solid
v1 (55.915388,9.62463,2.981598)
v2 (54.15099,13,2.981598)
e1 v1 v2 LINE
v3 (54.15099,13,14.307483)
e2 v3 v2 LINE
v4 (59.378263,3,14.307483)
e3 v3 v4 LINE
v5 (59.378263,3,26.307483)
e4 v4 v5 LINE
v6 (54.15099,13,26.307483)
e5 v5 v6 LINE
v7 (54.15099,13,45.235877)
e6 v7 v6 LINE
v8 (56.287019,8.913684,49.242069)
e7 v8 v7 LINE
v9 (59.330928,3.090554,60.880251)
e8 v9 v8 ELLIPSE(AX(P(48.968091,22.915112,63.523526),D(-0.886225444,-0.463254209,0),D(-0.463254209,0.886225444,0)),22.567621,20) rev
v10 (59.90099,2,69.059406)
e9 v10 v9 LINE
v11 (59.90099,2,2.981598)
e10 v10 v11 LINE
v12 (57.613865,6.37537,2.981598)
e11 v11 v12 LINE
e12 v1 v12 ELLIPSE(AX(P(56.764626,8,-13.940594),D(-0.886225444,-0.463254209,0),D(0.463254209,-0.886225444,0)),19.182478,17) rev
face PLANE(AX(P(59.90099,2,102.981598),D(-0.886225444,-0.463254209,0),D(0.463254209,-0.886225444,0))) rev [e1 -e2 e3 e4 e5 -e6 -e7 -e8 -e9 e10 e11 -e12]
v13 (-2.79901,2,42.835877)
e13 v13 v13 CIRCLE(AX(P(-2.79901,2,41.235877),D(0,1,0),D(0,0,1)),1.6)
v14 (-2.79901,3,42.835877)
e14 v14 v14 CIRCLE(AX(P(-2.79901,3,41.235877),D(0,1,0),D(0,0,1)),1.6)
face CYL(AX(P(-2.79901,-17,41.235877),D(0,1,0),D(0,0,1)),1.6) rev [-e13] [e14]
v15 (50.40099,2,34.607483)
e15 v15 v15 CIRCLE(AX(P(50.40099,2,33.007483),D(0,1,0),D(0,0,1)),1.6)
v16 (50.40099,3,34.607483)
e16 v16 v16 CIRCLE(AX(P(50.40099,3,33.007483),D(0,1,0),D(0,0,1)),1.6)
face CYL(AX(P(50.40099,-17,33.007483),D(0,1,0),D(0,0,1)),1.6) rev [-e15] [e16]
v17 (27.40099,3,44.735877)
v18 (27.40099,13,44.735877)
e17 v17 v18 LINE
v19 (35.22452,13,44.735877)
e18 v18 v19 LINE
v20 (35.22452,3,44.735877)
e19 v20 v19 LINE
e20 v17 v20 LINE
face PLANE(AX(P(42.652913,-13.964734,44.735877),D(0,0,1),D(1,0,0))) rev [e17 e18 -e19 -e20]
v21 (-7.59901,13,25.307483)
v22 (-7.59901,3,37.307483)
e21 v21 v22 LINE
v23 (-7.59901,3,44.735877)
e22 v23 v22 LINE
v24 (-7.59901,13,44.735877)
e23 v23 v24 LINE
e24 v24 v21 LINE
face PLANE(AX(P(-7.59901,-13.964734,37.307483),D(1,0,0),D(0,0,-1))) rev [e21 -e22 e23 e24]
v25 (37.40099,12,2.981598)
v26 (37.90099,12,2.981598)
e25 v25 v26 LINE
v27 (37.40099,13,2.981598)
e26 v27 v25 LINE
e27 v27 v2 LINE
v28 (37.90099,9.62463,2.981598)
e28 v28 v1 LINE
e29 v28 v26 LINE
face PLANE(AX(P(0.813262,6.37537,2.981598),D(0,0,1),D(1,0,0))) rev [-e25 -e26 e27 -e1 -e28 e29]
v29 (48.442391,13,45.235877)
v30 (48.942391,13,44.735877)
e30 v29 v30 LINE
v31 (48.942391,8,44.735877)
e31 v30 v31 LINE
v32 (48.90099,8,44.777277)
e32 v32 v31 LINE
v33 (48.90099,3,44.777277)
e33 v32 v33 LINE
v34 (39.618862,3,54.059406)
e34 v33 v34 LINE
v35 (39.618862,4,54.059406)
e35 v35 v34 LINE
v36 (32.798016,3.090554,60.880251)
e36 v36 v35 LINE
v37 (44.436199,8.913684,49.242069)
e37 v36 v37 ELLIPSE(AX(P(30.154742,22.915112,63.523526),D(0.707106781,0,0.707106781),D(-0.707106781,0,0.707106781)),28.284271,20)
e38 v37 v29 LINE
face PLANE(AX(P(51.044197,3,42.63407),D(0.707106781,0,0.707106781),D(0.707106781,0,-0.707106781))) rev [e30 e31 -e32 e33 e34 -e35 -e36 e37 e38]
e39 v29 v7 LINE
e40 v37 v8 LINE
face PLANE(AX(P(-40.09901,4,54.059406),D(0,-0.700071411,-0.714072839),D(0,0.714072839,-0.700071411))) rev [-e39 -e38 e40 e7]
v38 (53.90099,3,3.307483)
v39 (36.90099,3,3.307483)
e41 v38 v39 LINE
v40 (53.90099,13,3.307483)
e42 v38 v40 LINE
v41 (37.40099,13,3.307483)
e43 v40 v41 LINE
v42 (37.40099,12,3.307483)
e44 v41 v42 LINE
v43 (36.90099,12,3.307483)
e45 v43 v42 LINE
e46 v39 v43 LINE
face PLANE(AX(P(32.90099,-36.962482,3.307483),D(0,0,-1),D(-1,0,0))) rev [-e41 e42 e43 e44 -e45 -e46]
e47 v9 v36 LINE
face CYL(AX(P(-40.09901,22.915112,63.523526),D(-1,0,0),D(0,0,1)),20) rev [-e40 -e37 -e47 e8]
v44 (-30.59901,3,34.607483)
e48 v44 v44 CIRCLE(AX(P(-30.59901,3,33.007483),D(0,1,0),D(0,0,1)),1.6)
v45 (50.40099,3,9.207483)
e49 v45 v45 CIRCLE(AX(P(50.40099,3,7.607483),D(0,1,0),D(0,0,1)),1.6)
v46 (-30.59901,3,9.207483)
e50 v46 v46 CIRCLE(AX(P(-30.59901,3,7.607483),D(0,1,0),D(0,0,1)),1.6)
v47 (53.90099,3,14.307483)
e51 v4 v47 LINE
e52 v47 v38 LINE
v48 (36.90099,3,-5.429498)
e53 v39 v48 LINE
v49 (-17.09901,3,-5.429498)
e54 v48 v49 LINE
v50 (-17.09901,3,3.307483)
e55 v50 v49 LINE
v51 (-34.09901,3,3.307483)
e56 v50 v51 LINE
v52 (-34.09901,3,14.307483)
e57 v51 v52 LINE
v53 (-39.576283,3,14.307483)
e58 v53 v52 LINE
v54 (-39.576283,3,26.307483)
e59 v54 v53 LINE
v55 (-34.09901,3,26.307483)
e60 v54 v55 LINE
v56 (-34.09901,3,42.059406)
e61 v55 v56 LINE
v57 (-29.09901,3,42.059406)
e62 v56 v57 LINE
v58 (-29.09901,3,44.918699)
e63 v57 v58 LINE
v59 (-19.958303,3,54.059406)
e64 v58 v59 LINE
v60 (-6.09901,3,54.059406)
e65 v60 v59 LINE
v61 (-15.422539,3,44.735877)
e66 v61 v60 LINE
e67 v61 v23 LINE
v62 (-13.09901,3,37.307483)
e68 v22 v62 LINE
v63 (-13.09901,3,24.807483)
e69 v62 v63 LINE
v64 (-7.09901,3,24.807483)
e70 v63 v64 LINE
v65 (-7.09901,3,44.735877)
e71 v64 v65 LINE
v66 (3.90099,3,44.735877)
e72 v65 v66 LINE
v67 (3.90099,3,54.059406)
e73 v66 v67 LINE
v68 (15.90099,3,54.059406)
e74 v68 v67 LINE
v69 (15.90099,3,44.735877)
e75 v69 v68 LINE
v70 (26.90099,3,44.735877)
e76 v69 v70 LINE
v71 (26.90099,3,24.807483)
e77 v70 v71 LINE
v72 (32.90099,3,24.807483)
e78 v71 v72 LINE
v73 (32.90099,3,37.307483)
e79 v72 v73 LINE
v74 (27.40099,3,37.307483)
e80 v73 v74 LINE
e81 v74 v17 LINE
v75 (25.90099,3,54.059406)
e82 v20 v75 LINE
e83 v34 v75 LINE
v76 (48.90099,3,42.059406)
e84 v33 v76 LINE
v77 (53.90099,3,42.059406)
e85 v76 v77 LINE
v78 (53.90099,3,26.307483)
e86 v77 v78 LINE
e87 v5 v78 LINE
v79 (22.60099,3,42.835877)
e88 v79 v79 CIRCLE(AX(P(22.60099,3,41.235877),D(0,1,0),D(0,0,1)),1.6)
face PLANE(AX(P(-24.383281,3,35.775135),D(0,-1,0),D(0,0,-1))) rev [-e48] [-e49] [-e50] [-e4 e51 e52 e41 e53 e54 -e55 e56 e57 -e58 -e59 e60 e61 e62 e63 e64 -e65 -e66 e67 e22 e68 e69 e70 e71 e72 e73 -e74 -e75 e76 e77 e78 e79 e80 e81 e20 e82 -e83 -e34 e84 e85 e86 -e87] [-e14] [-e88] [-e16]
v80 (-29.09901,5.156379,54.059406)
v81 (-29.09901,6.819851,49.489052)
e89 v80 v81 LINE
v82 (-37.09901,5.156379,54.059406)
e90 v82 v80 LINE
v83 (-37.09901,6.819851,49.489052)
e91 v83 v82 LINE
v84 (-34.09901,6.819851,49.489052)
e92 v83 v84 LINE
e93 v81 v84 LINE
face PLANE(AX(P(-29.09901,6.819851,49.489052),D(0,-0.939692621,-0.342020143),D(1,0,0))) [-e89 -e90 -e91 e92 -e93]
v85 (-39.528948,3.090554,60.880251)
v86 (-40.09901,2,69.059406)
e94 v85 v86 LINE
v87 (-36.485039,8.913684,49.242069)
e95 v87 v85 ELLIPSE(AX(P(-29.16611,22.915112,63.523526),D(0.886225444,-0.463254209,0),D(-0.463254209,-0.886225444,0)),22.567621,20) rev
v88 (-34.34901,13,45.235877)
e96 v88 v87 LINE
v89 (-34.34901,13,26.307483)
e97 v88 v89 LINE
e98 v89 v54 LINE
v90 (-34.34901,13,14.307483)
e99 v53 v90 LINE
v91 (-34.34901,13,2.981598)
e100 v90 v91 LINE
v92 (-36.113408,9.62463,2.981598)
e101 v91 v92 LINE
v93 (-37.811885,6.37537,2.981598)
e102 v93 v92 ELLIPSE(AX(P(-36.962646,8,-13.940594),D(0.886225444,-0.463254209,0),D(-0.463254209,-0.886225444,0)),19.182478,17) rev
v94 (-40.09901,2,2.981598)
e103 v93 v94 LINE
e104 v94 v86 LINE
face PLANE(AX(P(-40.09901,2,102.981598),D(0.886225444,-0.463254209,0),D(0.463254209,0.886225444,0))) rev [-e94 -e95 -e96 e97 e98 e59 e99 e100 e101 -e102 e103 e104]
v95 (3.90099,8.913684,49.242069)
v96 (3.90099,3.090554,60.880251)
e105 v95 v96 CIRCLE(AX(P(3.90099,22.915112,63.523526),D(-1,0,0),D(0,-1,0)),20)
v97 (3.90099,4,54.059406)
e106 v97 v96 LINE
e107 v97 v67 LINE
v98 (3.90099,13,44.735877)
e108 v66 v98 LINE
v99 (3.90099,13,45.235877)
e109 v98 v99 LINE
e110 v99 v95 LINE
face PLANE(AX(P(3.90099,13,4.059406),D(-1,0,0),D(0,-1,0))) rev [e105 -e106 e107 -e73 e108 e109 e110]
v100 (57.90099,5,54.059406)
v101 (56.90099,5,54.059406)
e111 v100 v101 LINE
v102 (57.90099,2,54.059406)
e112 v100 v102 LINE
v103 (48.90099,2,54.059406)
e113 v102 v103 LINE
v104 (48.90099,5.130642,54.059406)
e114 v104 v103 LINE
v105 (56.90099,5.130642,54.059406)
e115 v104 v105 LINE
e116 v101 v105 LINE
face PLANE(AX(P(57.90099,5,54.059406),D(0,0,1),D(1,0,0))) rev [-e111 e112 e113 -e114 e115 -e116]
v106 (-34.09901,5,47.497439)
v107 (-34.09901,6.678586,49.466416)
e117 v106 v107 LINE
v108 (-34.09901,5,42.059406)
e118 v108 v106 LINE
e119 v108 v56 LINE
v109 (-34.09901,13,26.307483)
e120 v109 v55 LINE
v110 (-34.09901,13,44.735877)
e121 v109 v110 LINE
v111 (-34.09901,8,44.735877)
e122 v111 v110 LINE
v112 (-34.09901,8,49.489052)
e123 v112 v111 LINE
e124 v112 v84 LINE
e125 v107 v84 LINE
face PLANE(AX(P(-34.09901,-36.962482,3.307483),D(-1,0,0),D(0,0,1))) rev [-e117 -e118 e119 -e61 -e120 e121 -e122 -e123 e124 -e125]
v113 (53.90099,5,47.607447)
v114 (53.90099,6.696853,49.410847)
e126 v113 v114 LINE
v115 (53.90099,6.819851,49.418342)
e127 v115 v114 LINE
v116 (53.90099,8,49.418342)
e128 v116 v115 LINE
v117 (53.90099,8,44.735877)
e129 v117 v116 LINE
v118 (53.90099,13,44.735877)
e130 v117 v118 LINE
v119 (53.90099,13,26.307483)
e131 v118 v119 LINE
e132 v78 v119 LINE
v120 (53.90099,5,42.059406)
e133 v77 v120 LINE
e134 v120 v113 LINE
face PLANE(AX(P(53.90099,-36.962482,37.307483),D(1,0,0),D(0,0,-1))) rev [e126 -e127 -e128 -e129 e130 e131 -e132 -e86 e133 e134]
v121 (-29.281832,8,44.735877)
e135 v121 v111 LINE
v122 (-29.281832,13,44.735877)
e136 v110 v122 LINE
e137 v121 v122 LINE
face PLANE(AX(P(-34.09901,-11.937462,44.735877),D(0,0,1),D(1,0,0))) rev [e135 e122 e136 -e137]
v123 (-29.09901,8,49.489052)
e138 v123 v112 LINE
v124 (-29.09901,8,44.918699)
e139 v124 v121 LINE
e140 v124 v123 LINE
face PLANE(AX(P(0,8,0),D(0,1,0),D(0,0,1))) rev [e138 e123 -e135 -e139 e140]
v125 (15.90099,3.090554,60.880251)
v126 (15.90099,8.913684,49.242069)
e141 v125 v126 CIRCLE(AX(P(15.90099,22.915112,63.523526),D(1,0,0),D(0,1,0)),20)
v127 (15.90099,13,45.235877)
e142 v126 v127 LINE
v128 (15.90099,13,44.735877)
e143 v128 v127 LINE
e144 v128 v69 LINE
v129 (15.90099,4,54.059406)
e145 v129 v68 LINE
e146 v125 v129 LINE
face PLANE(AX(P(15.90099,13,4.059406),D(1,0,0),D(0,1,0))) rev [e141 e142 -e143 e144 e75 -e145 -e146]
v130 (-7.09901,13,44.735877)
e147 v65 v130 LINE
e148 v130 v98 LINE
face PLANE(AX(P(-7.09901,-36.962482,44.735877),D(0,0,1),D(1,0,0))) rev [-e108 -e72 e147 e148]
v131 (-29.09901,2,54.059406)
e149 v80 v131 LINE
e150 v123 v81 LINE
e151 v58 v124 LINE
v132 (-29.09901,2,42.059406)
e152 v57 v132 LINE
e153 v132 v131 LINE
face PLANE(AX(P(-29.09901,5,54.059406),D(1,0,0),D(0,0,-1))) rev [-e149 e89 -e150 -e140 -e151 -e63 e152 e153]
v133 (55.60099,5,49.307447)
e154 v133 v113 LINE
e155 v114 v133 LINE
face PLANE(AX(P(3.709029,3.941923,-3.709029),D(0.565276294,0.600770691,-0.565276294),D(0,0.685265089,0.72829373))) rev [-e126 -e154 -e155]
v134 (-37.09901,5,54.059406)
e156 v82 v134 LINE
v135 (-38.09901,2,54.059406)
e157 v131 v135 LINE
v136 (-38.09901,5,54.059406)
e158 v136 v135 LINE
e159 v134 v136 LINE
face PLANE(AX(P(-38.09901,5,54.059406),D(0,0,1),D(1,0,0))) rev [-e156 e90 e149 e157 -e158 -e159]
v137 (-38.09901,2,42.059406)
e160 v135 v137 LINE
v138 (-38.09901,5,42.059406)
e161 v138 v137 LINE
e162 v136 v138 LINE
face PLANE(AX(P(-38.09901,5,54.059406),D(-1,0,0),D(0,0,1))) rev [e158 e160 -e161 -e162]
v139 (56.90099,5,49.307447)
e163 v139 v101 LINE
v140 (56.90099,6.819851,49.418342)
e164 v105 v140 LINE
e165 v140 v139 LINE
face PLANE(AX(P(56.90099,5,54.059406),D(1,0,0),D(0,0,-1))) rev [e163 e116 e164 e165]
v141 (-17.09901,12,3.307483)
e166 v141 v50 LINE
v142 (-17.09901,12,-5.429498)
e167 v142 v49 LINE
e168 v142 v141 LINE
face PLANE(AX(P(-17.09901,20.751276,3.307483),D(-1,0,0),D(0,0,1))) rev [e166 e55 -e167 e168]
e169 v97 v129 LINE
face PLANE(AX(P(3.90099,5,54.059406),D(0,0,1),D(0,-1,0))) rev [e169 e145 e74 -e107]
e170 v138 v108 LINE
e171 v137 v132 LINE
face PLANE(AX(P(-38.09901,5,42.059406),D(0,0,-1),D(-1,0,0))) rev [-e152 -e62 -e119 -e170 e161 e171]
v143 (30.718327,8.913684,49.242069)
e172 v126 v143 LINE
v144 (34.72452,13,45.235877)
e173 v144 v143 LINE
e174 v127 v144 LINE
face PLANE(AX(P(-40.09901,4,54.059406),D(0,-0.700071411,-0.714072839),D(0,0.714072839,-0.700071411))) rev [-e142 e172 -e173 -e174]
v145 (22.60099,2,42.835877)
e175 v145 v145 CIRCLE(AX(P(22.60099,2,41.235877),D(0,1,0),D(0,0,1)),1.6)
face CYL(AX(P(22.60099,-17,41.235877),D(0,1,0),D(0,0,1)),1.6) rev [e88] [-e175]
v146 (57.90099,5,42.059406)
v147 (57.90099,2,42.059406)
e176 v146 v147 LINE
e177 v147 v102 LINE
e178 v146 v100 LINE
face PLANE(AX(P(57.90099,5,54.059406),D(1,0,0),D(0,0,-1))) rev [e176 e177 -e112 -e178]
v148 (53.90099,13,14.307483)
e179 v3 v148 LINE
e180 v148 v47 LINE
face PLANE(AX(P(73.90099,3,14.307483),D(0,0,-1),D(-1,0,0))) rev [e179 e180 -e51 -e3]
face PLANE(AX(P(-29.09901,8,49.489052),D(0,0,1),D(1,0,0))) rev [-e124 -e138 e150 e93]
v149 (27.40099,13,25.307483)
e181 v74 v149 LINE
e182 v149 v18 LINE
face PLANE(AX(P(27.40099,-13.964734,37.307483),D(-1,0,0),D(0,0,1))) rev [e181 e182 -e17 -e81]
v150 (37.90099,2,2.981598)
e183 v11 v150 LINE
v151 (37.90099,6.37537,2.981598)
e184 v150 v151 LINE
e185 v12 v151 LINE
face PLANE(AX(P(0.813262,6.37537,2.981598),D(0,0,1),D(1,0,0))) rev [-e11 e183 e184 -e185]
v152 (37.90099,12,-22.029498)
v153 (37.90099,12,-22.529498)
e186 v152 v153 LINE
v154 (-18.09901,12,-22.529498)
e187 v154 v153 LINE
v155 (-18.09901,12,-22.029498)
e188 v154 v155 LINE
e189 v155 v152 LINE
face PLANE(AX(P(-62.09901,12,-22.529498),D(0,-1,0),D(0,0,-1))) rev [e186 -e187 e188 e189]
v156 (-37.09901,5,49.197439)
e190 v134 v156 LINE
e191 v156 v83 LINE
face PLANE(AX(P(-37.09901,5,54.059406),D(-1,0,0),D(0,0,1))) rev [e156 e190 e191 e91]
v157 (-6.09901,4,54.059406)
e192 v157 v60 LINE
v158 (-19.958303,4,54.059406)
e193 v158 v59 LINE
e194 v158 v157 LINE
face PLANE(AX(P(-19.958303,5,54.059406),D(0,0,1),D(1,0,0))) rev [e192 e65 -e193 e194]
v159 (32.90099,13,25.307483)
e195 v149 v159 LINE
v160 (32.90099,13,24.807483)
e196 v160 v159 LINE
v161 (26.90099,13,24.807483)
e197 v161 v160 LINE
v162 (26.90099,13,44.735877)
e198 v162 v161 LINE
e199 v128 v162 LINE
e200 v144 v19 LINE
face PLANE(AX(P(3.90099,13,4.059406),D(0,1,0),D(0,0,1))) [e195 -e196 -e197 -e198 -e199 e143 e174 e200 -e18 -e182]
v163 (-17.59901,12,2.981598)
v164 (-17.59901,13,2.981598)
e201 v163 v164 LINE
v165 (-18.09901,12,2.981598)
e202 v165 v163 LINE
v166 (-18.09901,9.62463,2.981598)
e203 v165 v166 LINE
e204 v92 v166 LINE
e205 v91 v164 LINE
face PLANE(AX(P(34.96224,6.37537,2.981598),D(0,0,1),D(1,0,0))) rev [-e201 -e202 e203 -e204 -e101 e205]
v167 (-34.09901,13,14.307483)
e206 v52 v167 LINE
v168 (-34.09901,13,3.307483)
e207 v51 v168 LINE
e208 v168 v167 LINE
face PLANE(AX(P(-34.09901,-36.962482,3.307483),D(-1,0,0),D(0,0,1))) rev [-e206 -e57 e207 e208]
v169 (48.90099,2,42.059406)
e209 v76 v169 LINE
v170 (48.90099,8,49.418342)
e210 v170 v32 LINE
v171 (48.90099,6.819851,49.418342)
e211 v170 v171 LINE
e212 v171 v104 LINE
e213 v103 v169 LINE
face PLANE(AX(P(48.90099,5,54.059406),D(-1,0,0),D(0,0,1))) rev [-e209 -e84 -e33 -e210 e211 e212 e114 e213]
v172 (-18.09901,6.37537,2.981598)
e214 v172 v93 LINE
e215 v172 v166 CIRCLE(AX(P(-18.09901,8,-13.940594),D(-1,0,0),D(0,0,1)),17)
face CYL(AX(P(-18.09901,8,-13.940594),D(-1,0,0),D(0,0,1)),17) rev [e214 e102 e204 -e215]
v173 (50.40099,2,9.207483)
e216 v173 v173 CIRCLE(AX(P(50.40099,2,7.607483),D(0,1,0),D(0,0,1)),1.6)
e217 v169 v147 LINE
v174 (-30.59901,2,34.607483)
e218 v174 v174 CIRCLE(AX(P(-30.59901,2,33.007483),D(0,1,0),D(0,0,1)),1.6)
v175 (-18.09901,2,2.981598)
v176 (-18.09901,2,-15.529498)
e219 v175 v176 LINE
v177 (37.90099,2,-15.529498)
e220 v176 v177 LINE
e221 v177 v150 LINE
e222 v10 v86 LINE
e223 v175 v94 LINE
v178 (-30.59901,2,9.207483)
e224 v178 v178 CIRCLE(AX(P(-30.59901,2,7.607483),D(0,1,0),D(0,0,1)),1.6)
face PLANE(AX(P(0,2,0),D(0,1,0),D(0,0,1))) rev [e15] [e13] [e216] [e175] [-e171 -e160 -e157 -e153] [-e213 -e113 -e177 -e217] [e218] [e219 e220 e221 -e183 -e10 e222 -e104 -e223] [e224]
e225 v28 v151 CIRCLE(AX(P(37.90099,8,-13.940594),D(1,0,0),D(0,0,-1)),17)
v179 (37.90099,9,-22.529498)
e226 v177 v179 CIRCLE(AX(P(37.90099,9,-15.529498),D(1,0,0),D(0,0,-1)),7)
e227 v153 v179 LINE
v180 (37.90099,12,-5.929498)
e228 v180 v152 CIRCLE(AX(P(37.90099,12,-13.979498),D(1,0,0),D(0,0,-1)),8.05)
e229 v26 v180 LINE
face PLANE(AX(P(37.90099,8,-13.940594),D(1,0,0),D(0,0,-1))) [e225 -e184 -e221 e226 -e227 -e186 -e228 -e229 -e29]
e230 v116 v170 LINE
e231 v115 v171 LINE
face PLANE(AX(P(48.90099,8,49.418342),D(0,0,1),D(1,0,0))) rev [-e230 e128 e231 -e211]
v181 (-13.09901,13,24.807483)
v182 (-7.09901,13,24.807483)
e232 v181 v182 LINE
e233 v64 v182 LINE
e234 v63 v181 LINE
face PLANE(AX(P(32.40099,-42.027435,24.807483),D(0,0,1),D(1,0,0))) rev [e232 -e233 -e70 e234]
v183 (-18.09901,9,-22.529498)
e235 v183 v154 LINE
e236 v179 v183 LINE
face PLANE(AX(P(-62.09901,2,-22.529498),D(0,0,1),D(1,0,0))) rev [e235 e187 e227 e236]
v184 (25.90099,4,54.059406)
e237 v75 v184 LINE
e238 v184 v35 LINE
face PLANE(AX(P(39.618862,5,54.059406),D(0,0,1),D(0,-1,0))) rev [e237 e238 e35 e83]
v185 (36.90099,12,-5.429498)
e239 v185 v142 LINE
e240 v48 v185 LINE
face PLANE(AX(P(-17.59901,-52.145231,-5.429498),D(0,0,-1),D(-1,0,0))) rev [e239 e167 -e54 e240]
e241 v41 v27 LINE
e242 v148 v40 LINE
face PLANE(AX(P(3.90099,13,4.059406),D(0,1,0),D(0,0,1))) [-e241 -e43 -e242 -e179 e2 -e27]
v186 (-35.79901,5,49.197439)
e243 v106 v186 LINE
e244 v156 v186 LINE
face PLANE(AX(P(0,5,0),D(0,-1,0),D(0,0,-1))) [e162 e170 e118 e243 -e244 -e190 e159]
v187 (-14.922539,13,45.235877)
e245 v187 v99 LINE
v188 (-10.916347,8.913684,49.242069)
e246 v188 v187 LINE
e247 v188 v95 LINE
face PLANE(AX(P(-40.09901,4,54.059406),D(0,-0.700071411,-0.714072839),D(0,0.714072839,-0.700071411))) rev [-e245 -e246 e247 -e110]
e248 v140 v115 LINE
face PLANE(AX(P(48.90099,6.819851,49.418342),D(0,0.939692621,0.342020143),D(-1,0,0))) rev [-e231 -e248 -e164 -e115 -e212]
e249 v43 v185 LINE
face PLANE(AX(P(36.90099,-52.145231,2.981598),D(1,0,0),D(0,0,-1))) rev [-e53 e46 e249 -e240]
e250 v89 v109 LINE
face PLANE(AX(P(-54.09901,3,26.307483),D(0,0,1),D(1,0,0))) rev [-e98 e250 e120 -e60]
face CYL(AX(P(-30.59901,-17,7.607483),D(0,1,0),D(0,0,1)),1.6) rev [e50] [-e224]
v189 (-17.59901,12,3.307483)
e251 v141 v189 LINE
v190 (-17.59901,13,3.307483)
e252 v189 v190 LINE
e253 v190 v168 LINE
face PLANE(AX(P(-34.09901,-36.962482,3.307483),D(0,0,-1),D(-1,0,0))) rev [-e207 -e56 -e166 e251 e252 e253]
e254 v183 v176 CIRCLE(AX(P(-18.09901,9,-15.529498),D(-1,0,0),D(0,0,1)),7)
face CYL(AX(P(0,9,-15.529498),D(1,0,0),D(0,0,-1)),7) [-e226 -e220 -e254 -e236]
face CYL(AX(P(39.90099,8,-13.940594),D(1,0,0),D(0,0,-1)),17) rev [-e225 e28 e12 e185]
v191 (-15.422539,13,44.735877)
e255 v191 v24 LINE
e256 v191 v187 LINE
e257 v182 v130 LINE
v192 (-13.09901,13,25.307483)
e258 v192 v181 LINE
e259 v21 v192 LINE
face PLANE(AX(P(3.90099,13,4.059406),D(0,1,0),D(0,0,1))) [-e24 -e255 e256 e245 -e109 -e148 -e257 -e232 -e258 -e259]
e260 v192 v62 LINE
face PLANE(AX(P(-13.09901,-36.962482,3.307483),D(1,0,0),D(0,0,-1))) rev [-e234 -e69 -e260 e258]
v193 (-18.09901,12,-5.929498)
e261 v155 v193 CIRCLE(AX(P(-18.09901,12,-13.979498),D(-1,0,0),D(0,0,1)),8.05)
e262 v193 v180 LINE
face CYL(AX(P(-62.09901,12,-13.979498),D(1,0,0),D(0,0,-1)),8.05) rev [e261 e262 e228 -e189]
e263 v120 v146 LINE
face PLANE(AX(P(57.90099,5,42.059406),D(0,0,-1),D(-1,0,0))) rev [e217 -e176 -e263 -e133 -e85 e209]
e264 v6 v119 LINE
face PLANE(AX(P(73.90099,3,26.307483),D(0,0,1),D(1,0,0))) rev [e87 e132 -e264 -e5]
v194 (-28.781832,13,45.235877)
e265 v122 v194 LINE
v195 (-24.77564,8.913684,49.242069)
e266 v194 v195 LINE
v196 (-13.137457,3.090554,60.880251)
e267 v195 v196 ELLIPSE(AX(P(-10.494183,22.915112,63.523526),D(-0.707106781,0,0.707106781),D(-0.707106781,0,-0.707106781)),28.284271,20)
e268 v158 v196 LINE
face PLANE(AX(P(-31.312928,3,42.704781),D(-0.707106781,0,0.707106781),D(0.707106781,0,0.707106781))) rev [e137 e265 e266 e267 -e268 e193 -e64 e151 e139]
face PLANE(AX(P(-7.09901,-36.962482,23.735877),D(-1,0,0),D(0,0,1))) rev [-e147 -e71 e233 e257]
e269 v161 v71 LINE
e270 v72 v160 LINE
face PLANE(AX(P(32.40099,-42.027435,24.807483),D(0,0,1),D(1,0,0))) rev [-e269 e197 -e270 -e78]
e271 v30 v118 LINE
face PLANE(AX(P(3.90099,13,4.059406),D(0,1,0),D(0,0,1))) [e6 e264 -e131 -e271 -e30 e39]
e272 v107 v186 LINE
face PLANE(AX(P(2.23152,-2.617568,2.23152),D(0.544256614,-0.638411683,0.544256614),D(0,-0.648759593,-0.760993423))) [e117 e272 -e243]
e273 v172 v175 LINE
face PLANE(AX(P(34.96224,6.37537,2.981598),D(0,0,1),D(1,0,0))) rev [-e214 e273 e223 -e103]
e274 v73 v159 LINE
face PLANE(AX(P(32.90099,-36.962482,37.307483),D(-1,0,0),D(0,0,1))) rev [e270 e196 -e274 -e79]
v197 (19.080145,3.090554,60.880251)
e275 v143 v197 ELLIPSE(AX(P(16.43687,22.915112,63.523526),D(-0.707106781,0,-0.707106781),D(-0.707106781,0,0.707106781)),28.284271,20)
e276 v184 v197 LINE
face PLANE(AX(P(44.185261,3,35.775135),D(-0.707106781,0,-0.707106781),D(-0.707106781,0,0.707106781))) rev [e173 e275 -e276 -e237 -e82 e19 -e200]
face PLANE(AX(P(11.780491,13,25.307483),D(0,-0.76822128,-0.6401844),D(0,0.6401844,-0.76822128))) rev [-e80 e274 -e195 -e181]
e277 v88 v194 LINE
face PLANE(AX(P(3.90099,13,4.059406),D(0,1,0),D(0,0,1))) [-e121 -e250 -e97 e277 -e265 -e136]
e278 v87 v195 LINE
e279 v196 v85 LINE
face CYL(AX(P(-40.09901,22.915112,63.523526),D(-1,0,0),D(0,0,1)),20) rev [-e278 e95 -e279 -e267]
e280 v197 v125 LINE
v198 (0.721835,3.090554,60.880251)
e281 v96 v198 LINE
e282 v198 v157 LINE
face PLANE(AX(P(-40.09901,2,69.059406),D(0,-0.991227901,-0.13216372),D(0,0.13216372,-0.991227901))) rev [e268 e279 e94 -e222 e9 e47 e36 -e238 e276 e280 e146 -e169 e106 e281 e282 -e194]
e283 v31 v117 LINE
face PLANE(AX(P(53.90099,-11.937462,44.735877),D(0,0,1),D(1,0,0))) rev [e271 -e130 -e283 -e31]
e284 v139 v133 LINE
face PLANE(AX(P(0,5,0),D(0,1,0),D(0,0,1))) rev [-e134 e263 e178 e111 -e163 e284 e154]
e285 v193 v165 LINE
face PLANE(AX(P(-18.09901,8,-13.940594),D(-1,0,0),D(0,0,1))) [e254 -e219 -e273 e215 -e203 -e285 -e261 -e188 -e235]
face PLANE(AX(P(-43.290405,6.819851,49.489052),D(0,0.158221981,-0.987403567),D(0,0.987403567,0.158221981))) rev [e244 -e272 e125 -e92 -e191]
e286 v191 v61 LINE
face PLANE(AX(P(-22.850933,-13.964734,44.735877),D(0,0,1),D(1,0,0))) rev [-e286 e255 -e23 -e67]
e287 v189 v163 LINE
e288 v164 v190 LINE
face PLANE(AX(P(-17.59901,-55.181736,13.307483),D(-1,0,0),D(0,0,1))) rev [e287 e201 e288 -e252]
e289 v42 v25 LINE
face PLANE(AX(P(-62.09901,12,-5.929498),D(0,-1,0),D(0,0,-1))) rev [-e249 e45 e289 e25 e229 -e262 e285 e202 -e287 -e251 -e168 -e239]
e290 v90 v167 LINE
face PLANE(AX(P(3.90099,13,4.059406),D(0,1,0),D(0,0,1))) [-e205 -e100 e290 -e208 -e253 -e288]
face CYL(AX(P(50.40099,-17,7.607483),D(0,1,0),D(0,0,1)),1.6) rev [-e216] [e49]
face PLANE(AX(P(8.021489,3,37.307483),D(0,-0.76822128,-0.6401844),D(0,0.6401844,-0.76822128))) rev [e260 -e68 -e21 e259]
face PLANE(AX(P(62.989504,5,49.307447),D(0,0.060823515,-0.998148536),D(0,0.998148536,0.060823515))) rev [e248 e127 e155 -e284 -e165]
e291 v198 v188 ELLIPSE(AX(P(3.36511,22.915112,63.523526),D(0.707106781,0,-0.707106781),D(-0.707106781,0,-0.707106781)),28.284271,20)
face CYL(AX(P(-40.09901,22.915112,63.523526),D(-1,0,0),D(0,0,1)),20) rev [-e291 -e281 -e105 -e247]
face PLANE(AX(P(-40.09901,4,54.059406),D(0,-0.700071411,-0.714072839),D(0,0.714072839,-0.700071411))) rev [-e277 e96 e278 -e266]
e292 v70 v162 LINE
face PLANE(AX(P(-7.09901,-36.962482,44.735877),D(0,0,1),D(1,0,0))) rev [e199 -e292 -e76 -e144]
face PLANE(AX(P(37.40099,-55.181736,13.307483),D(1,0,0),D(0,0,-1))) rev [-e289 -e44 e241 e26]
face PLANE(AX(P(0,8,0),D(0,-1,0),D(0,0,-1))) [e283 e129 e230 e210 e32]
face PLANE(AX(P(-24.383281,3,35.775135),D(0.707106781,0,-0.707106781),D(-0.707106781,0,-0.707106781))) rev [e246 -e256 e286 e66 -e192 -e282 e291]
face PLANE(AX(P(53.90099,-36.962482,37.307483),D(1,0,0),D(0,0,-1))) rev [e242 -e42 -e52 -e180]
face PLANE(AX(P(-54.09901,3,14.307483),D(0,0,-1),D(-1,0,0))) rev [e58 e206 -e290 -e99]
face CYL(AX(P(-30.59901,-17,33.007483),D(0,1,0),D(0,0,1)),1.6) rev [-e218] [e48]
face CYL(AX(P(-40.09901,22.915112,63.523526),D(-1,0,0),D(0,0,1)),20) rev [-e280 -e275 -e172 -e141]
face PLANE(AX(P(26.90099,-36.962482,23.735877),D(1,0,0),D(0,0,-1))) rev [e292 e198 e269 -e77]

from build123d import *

# Parameters (mm, degrees)
SKETCH1_W             = 100
SKETCH1_H             = 95
BOSS_EXTRUDE2_DEPTH   = 20
CUT_EXTRUDE2_DEPTH    = 20
CUT_EXTRUDE3_START    = -22
CUT_EXTRUDE3_DEPTH    = 22
CUT_EXTRUDE4_DEPTH    = 2
SKETCH7_W             = 12
SKETCH7_H             = 10
CUT_EXTRUDE5_DEPTH    = 60
BOSS_EXTRUDE3_DEPTH   = 60
BOSS_EXTRUDE3_2_DEPTH = 60
SKETCH9_W             = 9.8
SKETCH9_H             = 15.2
CUT_EXTRUDE6_DEPTH    = 40
SKETCH10_W            = 9.7
SKETCH10_H            = 15.2
CUT_EXTRUDE7_DEPTH    = 40
SKETCH11_W            = 12
SKETCH11_H            = 10
CUT_EXTRUDE8_DEPTH    = 100
SKETCH12_W            = 39.436597342
SKETCH12_H            = 19.718298671
CUT_EXTRUDE9_DEPTH    = 100
CUT_EXTRUDE11_DEPTH   = 100
BOSS_EXTRUDE4_START   = -100
BOSS_EXTRUDE4_DEPTH   = 100
CUT_EXTRUDE12_REACH   = 95.581
SKETCH16_W            = 118.541652127
SKETCH16_H            = 71.876381232
SKETCH17_W            = 118.826271758
SKETCH17_H            = 93.94417767
CUT_EXTRUDE13_DEPTH   = 10
SKETCH18_R            = 8.1
CUT_EXTRUDE14_DEPTH   = 100
SKETCH19_W            = 45
SKETCH19_H            = 22.574653526
CUT_EXTRUDE16_DEPTH   = 10
SKETCH23_W            = 100
SKETCH23_H            = 16.30510129
BOSS_EXTRUDE6_DEPTH   = 10
SKETCH24_W            = 34
SKETCH24_H            = 21
CUT_EXTRUDE17_DEPTH   = 10
SKETCH25_W            = 45
SKETCH25_H            = 9.359456604
CUT_EXTRUDE18_DEPTH   = 10
SKETCH26_W            = 21
SKETCH26_H            = 34
CUT_EXTRUDE19_DEPTH   = 10
CUT_EXTRUDE20_DEPTH   = 22
CUT_EXTRUDE21_DEPTH   = 22
SKETCH29_W            = 15.251923191
SKETCH29_H            = 7.428393779
CUT_EXTRUDE22_DEPTH   = 10
CUT_EXTRUDE23_DEPTH   = 5.5
CUT_EXTRUDE24_DEPTH   = 5.5
BOSS_EXTRUDE9_DEPTH   = 100
SKETCH44_W            = 96.870466172
SKETCH44_H            = 84.683658551
CUT_EXTRUDE37_DEPTH   = 9.8
SKETCH45_W            = 7.532932596
SKETCH45_H            = 10
CUT_EXTRUDE38_DEPTH   = 100
SKETCH46_W            = 12
SKETCH46_H            = 85.376414904
CUT_EXTRUDE39_DEPTH   = 100
SKETCH47_W            = 144.570000294
SKETCH47_H            = 119.898222903
CUT_EXTRUDE40_DEPTH   = 2
CUT_EXTRUDE41_DEPTH   = 100
SKETCH49_W            = 33.934396209
SKETCH49_H            = 51.308285461
CUT_EXTRUDE44_DEPTH   = 9.7
SKETCH51_W            = 12
SKETCH51_H            = 7.5
BOSS_EXTRUDE13_DEPTH  = 2
CUT_EXTRUDE47_DEPTH   = 100
FILLET6_R             = 20
CUT_EXTRUDE48_DEPTH   = 100
SKETCH56_W            = 55
SKETCH56_H            = 18.976681206
CUT_EXTRUDE49_DEPTH   = 10
SKETCH57_W            = 12.959426316
SKETCH57_H            = 7.428393779
SKETCH57_W_2          = 11.011417888
CUT_EXTRUDE50_DEPTH   = 10
SKETCH58_W            = 33.922191822
SKETCH58_H            = 11
BOSS_EXTRUDE14_DEPTH  = 56
CUT_EXTRUDE52_DEPTH   = 100
SKETCH60_W            = 54.5
SKETCH60_H            = 8.411095911
CUT_EXTRUDE54_DEPTH   = 9
SKETCH62_W            = 9
SKETCH62_H            = 12
CUT_EXTRUDE55_DEPTH   = 3
SKETCH63_W            = 5
SKETCH63_H            = 7.358935777
SKETCH63_H_2          = 7.429646455
CUT_EXTRUDE56_DEPTH   = 3
CHAMFER1_SIZE         = 5
CHAMFER1_SIZE_2       = 1.819851171
CUT_EXTRUDE57_DEPTH   = 3
CUT_EXTRUDE58_DEPTH   = 3
CHAMFER3_START        = 4.100125042
CHAMFER3_DEPTH        = 0.925236243
SKETCH67_W            = 12
SKETCH67_H            = 10
CUT_EXTRUDE59_DEPTH   = 20
SKETCH68_W            = 12
SKETCH68_H            = 10
CUT_EXTRUDE60_DEPTH   = 20
SKETCH69_W            = 0.5
SKETCH69_H            = 0.325884987
BOSS_EXTRUDE15_DEPTH  = 9
SKETCH70_W            = 0.5
SKETCH70_H            = 8.736980898
BOSS_EXTRUDE16_DEPTH  = 9
SKETCH71_W            = 45
SKETCH71_H            = 1.571606221
CUT_EXTRUDE61_DEPTH   = 10
SKETCH72_W            = 47.768265836
SKETCH72_H            = 12.037959142
CUT_EXTRUDE62_DEPTH   = 10
CHAMFER4_START        = 4.610133616
CHAMFER4_DEPTH        = 1.951310752
FILLET10_R            = 7
SKETCH73_R            = 1.6
CUT_EXTRUDE63_DEPTH   = 20


with BuildPart() as part:
    # Sketch1 → Boss-Extrude2 (new body)
    with BuildSketch(Plane(origin=(0, 0, 0), x_dir=(1, 0, 0), z_dir=(0, 1, 0))):
        with Locations((9.900990099, -16.559405941)):
            Rectangle(SKETCH1_W, SKETCH1_H)
    extrude(amount=BOSS_EXTRUDE2_DEPTH)

    # Sketch2 → Cut-Extrude2 (cut)
    with BuildSketch(Plane(origin=(59.900990099, 0, 0), x_dir=(0, 0, -1), z_dir=(1, 0, 0))):
        with BuildLine():
            Line((-1.059405941, 0), (28.940594059, 0))
            Line((28.940594059, 0), (30.940594059, 0))
            Line((30.940594059, 0), (30.940594059, 20))
            Line((30.940594059, 20), (25.982188638, 20))
            Line((25.982188638, 20), (1.898999481, 20))
            ThreePointArc((1.898999481, 20), (-2.876419925, 10.487577267), (-1.059405941, 0))
        make_face()
    extrude(amount=-CUT_EXTRUDE2_DEPTH, mode=Mode.SUBTRACT)

    # Sketch3 → Cut-Extrude3 (cut)
    with BuildSketch(Plane.ZY.offset(40.099009901).offset(CUT_EXTRUDE3_START)):
        with BuildLine():
            Line((-1.898999481, 20), (-30.940594059, 20))
            Line((-30.940594059, 20), (-30.940594059, 0))
            Line((-30.940594059, 0), (1.059405941, 0))
            ThreePointArc((1.059405941, 0), (2.876419925, 10.487577267), (-1.898999481, 20))
        make_face()
    extrude(amount=CUT_EXTRUDE3_DEPTH, mode=Mode.SUBTRACT)

    # Sketch5 → Cut-Extrude4 (cut)
    with BuildSketch(Plane(origin=(39.900990099, 0, 0), x_dir=(0, 0, -1), z_dir=(1, 0, 0))):
        with BuildLine():
            Line((19.633434706, 24.018475751), (30.940594059, 20))
            Line((30.940594059, 20), (30.940594059, 0))
            Line((30.940594059, 0), (21.215348762, -7.364828148))
            ThreePointArc((21.215348762, -7.364828148), (-3.037850309, 7.144180617), (19.633434706, 24.018475751))
        make_face()
    extrude(amount=-CUT_EXTRUDE4_DEPTH, mode=Mode.SUBTRACT)

    # Sketch7 → Cut-Extrude5 (cut)
    with BuildSketch(Plane.XY.offset(64.059405941)):
        with Locations((9.900990099, 8)):
            Rectangle(SKETCH7_W, SKETCH7_H)
    extrude(amount=-CUT_EXTRUDE5_DEPTH, mode=Mode.SUBTRACT)

    # Sketch9 → Cut-Extrude6 (cut)
    with BuildSketch(Plane(origin=(33.98019802, 0, 33.98019802), x_dir=(0.7071067811865472, 0, -0.7071067811865479), z_dir=(0.7071067811865479, 0, 0.7071067811865472))):
        with Locations((-47.438423787, 10.6)):
            Rectangle(SKETCH9_W, SKETCH9_H)
    extrude(amount=-CUT_EXTRUDE6_DEPTH, mode=Mode.SUBTRACT)

    # Sketch10 → Cut-Extrude7 (cut)
    with BuildSketch(Plane(origin=(-24.079207921, 0, 24.079207921), x_dir=(0.7071067811865496, 0, 0.7071067811865456), z_dir=(-0.7071067811865456, 0, 0.7071067811865496))):
        with Locations((61.390538266, 10.6)):
            Rectangle(SKETCH10_W, SKETCH10_H)
    extrude(amount=-CUT_EXTRUDE7_DEPTH, mode=Mode.SUBTRACT)

    # Sketch11 → Cut-Extrude8 (cut)
    with BuildSketch(Plane(origin=(59.900990099, 0, 0), x_dir=(0, 0, -1), z_dir=(1, 0, 0))):
        with Locations((-19.876419925, 8)):
            Rectangle(SKETCH11_W, SKETCH11_H)
    extrude(amount=-CUT_EXTRUDE8_DEPTH, mode=Mode.SUBTRACT)

    # Sketch13 → Cut-Extrude11 (cut)
    with BuildSketch(Plane(origin=(59.900990099, 0, 0), x_dir=(0, 0, -1), z_dir=(1, 0, 0))):
        Polygon((-64.059405941, 0), (-54.059405941, 3), (-39.059405941, 20), (-64.059405941, 20), align=None)
    extrude(amount=-CUT_EXTRUDE11_DEPTH, mode=Mode.SUBTRACT)

    # Sketch15 → Boss-Extrude4 (add)
    with BuildSketch(Plane(origin=(59.900990099, 0, 0), x_dir=(0, 0, -1), z_dir=(1, 0, 0)).offset(BOSS_EXTRUDE4_START)):
        Polygon((-64.059405941, 0), (-69.059405941, 0), (-54.059405941, 3), align=None)
    extrude(amount=BOSS_EXTRUDE4_DEPTH)

    # Cut-Extrude12: up to this face of the body (flat: up to its plane)
    cut_extrude12_end = Plane(part.part.faces().sort_by_distance((9.900990099, 13, 21.397301034))[0])
    # Sketch16 → Cut-Extrude12 (cut, up to the picked face)
    with BuildSketch(Plane(origin=(0, 20, 0), x_dir=(1, 0, 0), z_dir=(0, 1, 0)), mode=Mode.PRIVATE) as cut_extrude12_sk1:
        with Locations((7.676480363, -3.191236494)):
            Rectangle(SKETCH16_W, SKETCH16_H)
    cut_extrude12_tool1 = split(extrude(cut_extrude12_sk1.sketch, amount=-CUT_EXTRUDE12_REACH, mode=Mode.PRIVATE), bisect_by=cut_extrude12_end, keep=Keep.BOTH, mode=Mode.PRIVATE)
    add(cut_extrude12_tool1.solids().sort_by(Axis((7.67648, 20, 3.191236), (0, -1, 0)))[0], mode=Mode.SUBTRACT)

    # Sketch17 → Cut-Extrude13 (cut)
    with BuildSketch(Plane(origin=(0, 13, 0), x_dir=(1, 0, 0), z_dir=(0, 1, 0))):
        with Locations((8.099723254, -37.149102118)):
            Rectangle(SKETCH17_W, SKETCH17_H)
    extrude(amount=CUT_EXTRUDE13_DEPTH, mode=Mode.SUBTRACT)

    # Sketch18 → Cut-Extrude14 (cut)
    with BuildSketch(Plane(origin=(37.900990099, 0, 0), x_dir=(0, 0, -1), z_dir=(1, 0, 0))):
        with Locations((14.018402237, 11)):
            Circle(SKETCH18_R)
    extrude(amount=-CUT_EXTRUDE14_DEPTH, mode=Mode.SUBTRACT)

    # Sketch19 → Cut-Extrude16 (cut)
    with BuildSketch(Plane(origin=(0, 13, 0), x_dir=(1, 0, 0), z_dir=(0, 1, 0))):
        with Locations((9.900990099, -7.118128307)):
            Rectangle(SKETCH19_W, SKETCH19_H)
    extrude(amount=-CUT_EXTRUDE16_DEPTH, mode=Mode.SUBTRACT)

    # Sketch23 → Boss-Extrude6 (add)
    with BuildSketch(Plane(origin=(0, 13, 0), x_dir=(1, 0, 0), z_dir=(0, 1, 0))):
        with Locations((9.900990099, -22.02897057)):
            Rectangle(SKETCH23_W, SKETCH23_H)
    extrude(amount=-BOSS_EXTRUDE6_DEPTH)

    # Sketch24 → Cut-Extrude17 (cut)
    with BuildSketch(Plane(origin=(0, 13, 0), x_dir=(1, 0, 0), z_dir=(0, 1, 0))):
        with Locations((9.900990099, -34.235876529)):
            Rectangle(SKETCH24_W, SKETCH24_H)
    extrude(amount=-CUT_EXTRUDE17_DEPTH, mode=Mode.SUBTRACT)

    # Sketch25 → Cut-Extrude18 (cut)
    with BuildSketch(Plane(origin=(0, 13, 0), x_dir=(1, 0, 0), z_dir=(0, 1, 0))):
        with Locations((9.900990099, -18.556148227)):
            Rectangle(SKETCH25_W, SKETCH25_H)
    extrude(amount=-CUT_EXTRUDE18_DEPTH, mode=Mode.SUBTRACT)

    # Sketch26 → Cut-Extrude19 (cut)
    with BuildSketch(Plane(origin=(0, 13, 0), x_dir=(1, 0, 0), z_dir=(0, 1, 0))):
        with Locations((-23.599009901, -20.30748275)):
            Rectangle(SKETCH26_W, SKETCH26_H)
        with Locations((43.400990099, -20.30748275)):
            Rectangle(SKETCH26_W, SKETCH26_H)
    extrude(amount=-CUT_EXTRUDE19_DEPTH, mode=Mode.SUBTRACT)

    # Sketch27 → Cut-Extrude20 (cut)
    with BuildSketch(Plane(origin=(59.900990099, 0, 0), x_dir=(0, 0, -1), z_dir=(1, 0, 0))):
        Polygon((-2.981597763, 6.375369602), (-2.981597763, 22.818607258), (10.704836096, 22.818607258), (10.704836096, 6.375369602), (11.352266392, 6.375369602), (11.352266392, -11.387239174), (-2.981597763, -11.387239174), align=None)
    extrude(amount=-CUT_EXTRUDE20_DEPTH, mode=Mode.SUBTRACT)

    # Sketch28 → Cut-Extrude21 (cut)
    with BuildSketch(Plane.ZY.offset(40.099009901)):
        Polygon((-10.420850948, 6.375369602), (-11.33614904, 6.375369602), (-11.33614904, 34.716091764), (2.981597763, 34.716091764), (2.981597763, 6.375369602), (2.981597763, -16.376944967), (-10.420850948, -16.376944967), align=None)
    extrude(amount=-CUT_EXTRUDE21_DEPTH, mode=Mode.SUBTRACT)

    # Sketch29 → Cut-Extrude22 (cut)
    with BuildSketch(Plane(origin=(0, 13, 0), x_dir=(1, 0, 0), z_dir=(0, 1, 0))):
        with Locations((-15.224971497, -41.02167964)):
            Rectangle(SKETCH29_W, SKETCH29_H)
        with Locations((35.026951694, -41.02167964)):
            Rectangle(SKETCH29_W, SKETCH29_H)
    extrude(amount=-CUT_EXTRUDE22_DEPTH, mode=Mode.SUBTRACT)

    # Sketch30 → Cut-Extrude23 (cut)
    with BuildSketch(Plane.ZY.offset(13.099009901)):
        Polygon((37.30748275, 3), (25.30748275, 13), (37.30748275, 13), align=None)
    extrude(amount=-CUT_EXTRUDE23_DEPTH, mode=Mode.SUBTRACT)

    # Sketch31 → Cut-Extrude24 (cut)
    with BuildSketch(Plane(origin=(32.900990099, 0, 0), x_dir=(0, 0, -1), z_dir=(1, 0, 0))):
        Polygon((-37.30748275, 3), (-37.30748275, 13), (-25.30748275, 13), align=None)
    extrude(amount=-CUT_EXTRUDE24_DEPTH, mode=Mode.SUBTRACT)

    # Sketch43 → Boss-Extrude9 (add)
    with BuildSketch(Plane(origin=(59.900990099, 0, 0), x_dir=(0, 0, -1), z_dir=(1, 0, 0))):
        Polygon((-69.059405941, 0), (-54.059405941, 3), (-45.235876529, 13), (-69.059405941, 13), align=None)
    extrude(amount=-BOSS_EXTRUDE9_DEPTH)

    # Sketch44 → Cut-Extrude37 (cut)
    with BuildSketch(Plane(origin=(-37.008854376, 0, 37.008854376), x_dir=(-0.7071067811865479, 0, -0.7071067811865472), z_dir=(0.7071067811865472, 0, -0.7071067811865479))):
        with Locations((-56.490489978, 45.341829276)):
            Rectangle(SKETCH44_W, SKETCH44_H)
    extrude(amount=CUT_EXTRUDE37_DEPTH, mode=Mode.SUBTRACT)

    # Sketch45 → Cut-Extrude38 (cut)
    with BuildSketch(Plane(origin=(4.205063327, 0, -4.205063327), x_dir=(0.7071067811865488, 0, 0.7071067811865464), z_dir=(-0.7071067811865464, 0, 0.7071067811865488))):
        with Locations((62.474071968, 8)):
            Rectangle(SKETCH45_W, SKETCH45_H)
    extrude(amount=CUT_EXTRUDE38_DEPTH, mode=Mode.SUBTRACT)

    # Sketch46 → Cut-Extrude39 (cut)
    with BuildSketch(Plane(origin=(0, 3, 0), x_dir=(1, 0, 0), z_dir=(0, 1, 0))):
        with Locations((9.900990099, -87.424083981)):
            Rectangle(SKETCH46_W, SKETCH46_H)
    extrude(amount=CUT_EXTRUDE39_DEPTH, mode=Mode.SUBTRACT)

    # Sketch47 → Cut-Extrude40 (cut)
    with BuildSketch(Plane(origin=(0, 0, 0), x_dir=(-1, 0, 0), z_dir=(0, -1, 0))):
        with Locations((-24.404405804, -23.651470154)):
            Rectangle(SKETCH47_W, SKETCH47_H)
    extrude(amount=-CUT_EXTRUDE40_DEPTH, mode=Mode.SUBTRACT)

    # Sketch48 → Cut-Extrude41 (cut)
    with BuildSketch(Plane(origin=(59.900990099, 0, 0), x_dir=(0, 0, -1), z_dir=(1, 0, 0))):
        Polygon((-69.059405941, 2), (-54.059405941, 4), (-45.235876529, 13), (-69.059405941, 13), align=None)
    extrude(amount=-CUT_EXTRUDE41_DEPTH, mode=Mode.SUBTRACT)

    # Sketch49 → Cut-Extrude44 (cut)
    with BuildSketch(Plane(origin=(39.98019802, 0, 39.98019802), x_dir=(0.7071067811865457, 0, -0.7071067811865495), z_dir=(0.7071067811865495, 0, 0.7071067811865457))):
        with Locations((-23.692743151, 28.654142731)):
            Rectangle(SKETCH49_W, SKETCH49_H)
    extrude(amount=CUT_EXTRUDE44_DEPTH, mode=Mode.SUBTRACT)


with BuildPart() as body_2:
    # Sketch8 → Boss-Extrude3 (new body)
    with BuildSketch(Plane(origin=(0, 20, 0), x_dir=(1, 0, 0), z_dir=(0, 1, 0))):
        Polygon((15.900990099, -64.059405941), (19.900990099, -68.059405941), (19.900990099, -64.059405941), align=None)
    extrude(amount=BOSS_EXTRUDE3_DEPTH)


with BuildPart() as body_3:
    # Sketch8 → Boss-Extrude3 2 (new body)
    with BuildSketch(Plane(origin=(0, 20, 0), x_dir=(1, 0, 0), z_dir=(0, 1, 0))):
        Polygon((3.900990099, -64.059405941), (-0.099009901, -68.059405941), (-0.099009901, -64.059405941), align=None)
    extrude(amount=BOSS_EXTRUDE3_2_DEPTH)


with BuildPart() as cut_extrude9_tool:
    # Sketch12 → Cut-Extrude9 (new body)
    with BuildSketch(Plane(origin=(0, 20, 0), x_dir=(1, 0, 0), z_dir=(0, 1, 0))):
        with Locations((5.957330365, -62.235437498)):
            Rectangle(SKETCH12_W, SKETCH12_H)
    extrude(amount=CUT_EXTRUDE9_DEPTH)


with BuildPart() as body_2_1:
    add(body_2.part)

    # Cut-Extrude9: cut by cut_extrude9_tool
    add(cut_extrude9_tool.part, mode=Mode.SUBTRACT)


with BuildPart() as body_3_1:
    add(body_3.part)

    # Cut-Extrude9: cut by cut_extrude9_tool
    add(cut_extrude9_tool.part, mode=Mode.SUBTRACT)


with BuildPart() as body_2_2:
    # of the pieces the cut leaves, the one that is kept (cut_extrude44_keep)
    add(part.part.solids().sort_by_distance((37.900990099, 2, -30.940594059))[0])

    # Sketch51 → Boss-Extrude13 (add)
    with BuildSketch(Plane(origin=(0, 3, 0), x_dir=(1, 0, 0), z_dir=(0, 1, 0))):
        with Locations((9.900990099, -57.809405941)):
            Rectangle(SKETCH51_W, SKETCH51_H)
        Polygon((1.400990099, -61.559405941), (-12.458302812, -61.559405941), (-19.958302812, -54.059405941), (-6.099009901, -54.059405941), align=None)
        Polygon((18.400990099, -61.559405941), (25.900990099, -54.059405941), (39.618861654, -54.059405941), (32.118861654, -61.559405941), align=None)
    extrude(amount=BOSS_EXTRUDE13_DEPTH)

    # Sketch54 → Cut-Extrude47 (cut)
    with BuildSketch(Plane(origin=(59.900990099, 0, 0), x_dir=(0, 0, -1), z_dir=(1, 0, 0))):
        Polygon((-69.059405941, 2), (-54.059405941, 4), (-46.862984026, 11.340350353), (-64.590291843, 12.008025107), align=None)
    extrude(amount=-CUT_EXTRUDE47_DEPTH, mode=Mode.SUBTRACT)

    # Fillet6
    fillet6_edges = [body_2_2.edges().sort_by_distance(p)[0] for p in [
        (-1.099009901, 4, 54.059405941),
        (-30.028656357, 4, 54.059405941),
        (49.759925877, 4, 54.059405941),
        (20.900990099, 4, 54.059405941),
    ]]
    fillet(fillet6_edges, radius=FILLET6_R)

    # Sketch55 → Cut-Extrude48 (cut)
    with BuildSketch(Plane(origin=(0, 0, 2.981597763), x_dir=(-1, 0, 0), z_dir=(0, 0, -1))):
        Polygon((-59.900990099, 2), (-54.150990099, 13), (-59.900990099, 13), align=None)
        Polygon((40.099009901, 2), (34.349009901, 13), (40.099009901, 13), align=None)
    extrude(amount=-CUT_EXTRUDE48_DEPTH, mode=Mode.SUBTRACT)

    # Sketch56 → Cut-Extrude49 (cut)
    with BuildSketch(Plane(origin=(0, 13, 0), x_dir=(1, 0, 0), z_dir=(0, 1, 0))):
        with Locations((9.900990099, -3.819142147)):
            Rectangle(SKETCH56_W, SKETCH56_H)
    extrude(amount=-CUT_EXTRUDE49_DEPTH, mode=Mode.SUBTRACT)

    # Sketch57 → Cut-Extrude50 (cut)
    with BuildSketch(Plane(origin=(0, 13, 0), x_dir=(1, 0, 0), z_dir=(0, 1, 0))):
        with Locations((-27.619296743, -41.02167964)):
            Rectangle(SKETCH57_W, SKETCH57_H)
        with Locations((48.395281155, -41.02167964)):
            Rectangle(SKETCH57_W_2, SKETCH57_H)
    extrude(amount=-CUT_EXTRUDE50_DEPTH, mode=Mode.SUBTRACT)

    # Sketch58 → Boss-Extrude14 (add)
    with BuildSketch(Plane(origin=(37.900990099, 0, 0), x_dir=(0, 0, -1), z_dir=(1, 0, 0))):
        with Locations((13.979498148, 7.5)):
            Rectangle(SKETCH58_W, SKETCH58_H)
    extrude(amount=-BOSS_EXTRUDE14_DEPTH)

    # Sketch59 → Cut-Extrude52 (cut)
    with BuildSketch(Plane(origin=(37.900990099, 0, 0), x_dir=(0, 0, -1), z_dir=(1, 0, 0))):
        with BuildLine():
            Line((5.929498148, 12), (-2.981597763, 12))
            Line((-2.981597763, 12), (-2.981597763, 13))
            Line((-2.981597763, 13), (10.800103806, 21.572693884))
            Line((10.800103806, 21.572693884), (31.372864154, 18.661867154))
            Line((31.372864154, 18.661867154), (30.940594059, 2))
            Line((30.940594059, 2), (22.529498148, 2))
            Line((22.529498148, 2), (22.529498148, 12))
            Line((22.529498148, 12), (22.029498148, 12))
            ThreePointArc((22.029498148, 12), (13.979498148, 3.95), (5.929498148, 12))
        make_face()
    extrude(amount=-CUT_EXTRUDE52_DEPTH, mode=Mode.SUBTRACT)

    # Sketch60 → Cut-Extrude54 (cut)
    with BuildSketch(Plane(origin=(0, 12, 0), x_dir=(1, 0, 0), z_dir=(0, 1, 0))):
        with Locations((9.650990099, 1.223950193)):
            Rectangle(SKETCH60_W, SKETCH60_H)
    extrude(amount=-CUT_EXTRUDE54_DEPTH, mode=Mode.SUBTRACT)

    # Sketch62 → Cut-Extrude55 (cut)
    with BuildSketch(Plane.XZ.offset(-2)):
        with Locations((53.400990099, 48.059405941)):
            Rectangle(SKETCH62_W, SKETCH62_H)
        with Locations((-33.599009901, 48.059405941)):
            Rectangle(SKETCH62_W, SKETCH62_H)
    extrude(amount=-CUT_EXTRUDE55_DEPTH, mode=Mode.SUBTRACT)

    # Sketch63 → Cut-Extrude56 (cut)
    with BuildSketch(Plane(origin=(0, 5, 0), x_dir=(-1, 0, 0), z_dir=(0, -1, 0))):
        with Locations((-51.400990099, -45.73887383)):
            Rectangle(SKETCH63_W, SKETCH63_H)
        with Locations((31.599009901, -45.774229168)):
            Rectangle(SKETCH63_W, SKETCH63_H_2)
    extrude(amount=-CUT_EXTRUDE56_DEPTH, mode=Mode.SUBTRACT)

    # Chamfer1
    # the kernel refuses this chamfer: 5, 1.819851171 mm, written as the material it takes off along each edge
    with BuildSketch(Plane(origin=(48.900990099, 5, 49.418341718), x_dir=(0, 0, 1), z_dir=(1, 0, 0))) as chamfer1_piece_1_section:
        Polygon((CHAMFER1_SIZE, 0), (0, -CHAMFER1_SIZE_2), (0, 0), align=None)
    chamfer1_piece_1 = extrude(amount=5, mode=Mode.PRIVATE)
    chamfer1_piece_1 = split(chamfer1_piece_1, bisect_by=Plane(origin=(48.900990099, 5, 54.059405941), z_dir=(0, 0, -1)), keep=Keep.TOP, mode=Mode.PRIVATE)
    add(chamfer1_piece_1, mode=Mode.SUBTRACT)
    with BuildSketch(Plane(origin=(-29.099009901, 5, 49.489052396), x_dir=(0, 0, 1), z_dir=(-1, 0, 0))) as chamfer1_piece_2_section:
        Polygon((CHAMFER1_SIZE, 0), (0, CHAMFER1_SIZE_2), (0, 0), align=None)
    chamfer1_piece_2 = extrude(amount=5, mode=Mode.PRIVATE)
    chamfer1_piece_2 = split(chamfer1_piece_2, bisect_by=Plane(origin=(-29.099009901, 5, 54.059405941), z_dir=(0, 0, -1)), keep=Keep.TOP, mode=Mode.PRIVATE)
    add(chamfer1_piece_2, mode=Mode.SUBTRACT)

    # Sketch65 → Cut-Extrude57 (cut)
    with BuildSketch(Plane.ZY.offset(-53.900990099)):
        Polygon((49.418341718, 6.819851171), (54.059405941, 5.130641939), (54.059405941, 5), (49.307446654, 5), align=None)
    extrude(amount=-CUT_EXTRUDE57_DEPTH, mode=Mode.SUBTRACT)

    # Sketch66 → Cut-Extrude58 (cut)
    with BuildSketch(Plane(origin=(-34.099009901, 0, 0), x_dir=(0, 0, -1), z_dir=(1, 0, 0))):
        Polygon((-49.489052396, 6.819851171), (-54.059405941, 5.156378521), (-54.059405941, 5), (-49.197438646, 5), align=None)
    extrude(amount=-CUT_EXTRUDE58_DEPTH, mode=Mode.SUBTRACT)

    # Chamfer3: read off the stored shape, not the designer's step
    # Chamfer3 outline → Chamfer3 (cut)
    with BuildSketch(Plane(origin=(0, 0, 0), x_dir=(0.8389187913531886, 0.41417570363718603, -0.3530916991818797), z_dir=(0.5442566136617039, -0.6384116829844108, 0.5442566136617057)).offset(CHAMFER3_START)):
        Polygon((-43.306372973, 41.976414042), (-45.332790806, 40.682725223), (-43.306372973, 39.389036403), align=None)
    extrude(amount=CHAMFER3_DEPTH, mode=Mode.SUBTRACT)

    # Sketch67 → Cut-Extrude59 (cut)
    with BuildSketch(Plane(origin=(-34.099009901, 0, 0), x_dir=(0, 0, -1), z_dir=(1, 0, 0))):
        with Locations((-20.30748275, 8)):
            Rectangle(SKETCH67_W, SKETCH67_H)
    extrude(amount=-CUT_EXTRUDE59_DEPTH, mode=Mode.SUBTRACT)

    # Sketch68 → Cut-Extrude60 (cut)
    with BuildSketch(Plane.ZY.offset(-53.900990099)):
        with Locations((20.30748275, 8)):
            Rectangle(SKETCH68_W, SKETCH68_H)
    extrude(amount=-CUT_EXTRUDE60_DEPTH, mode=Mode.SUBTRACT)

    # Sketch69 → Boss-Extrude15 (add)
    with BuildSketch(Plane(origin=(0, 12, 0), x_dir=(1, 0, 0), z_dir=(0, 1, 0))):
        with Locations((37.150990099, -3.144540257)):
            Rectangle(SKETCH69_W, SKETCH69_H)
    extrude(amount=-BOSS_EXTRUDE15_DEPTH)

    # Sketch70 → Boss-Extrude16 (add)
    with BuildSketch(Plane(origin=(0, 3, 0), x_dir=(1, 0, 0), z_dir=(0, 1, 0))):
        with Locations((-17.349009901, 1.061007699)):
            Rectangle(SKETCH70_W, SKETCH70_H)
    extrude(amount=BOSS_EXTRUDE16_DEPTH)

    # Sketch71 → Cut-Extrude61 (cut)
    with BuildSketch(Plane(origin=(0, 13, 0), x_dir=(1, 0, 0), z_dir=(0, 1, 0))):
        with Locations((9.900990099, -24.02167964)):
            Rectangle(SKETCH71_W, SKETCH71_H)
    extrude(amount=-CUT_EXTRUDE61_DEPTH, mode=Mode.SUBTRACT)

    # Sketch72 → Cut-Extrude62 (cut)
    with BuildSketch(Plane(origin=(0, 13, 0), x_dir=(1, 0, 0), z_dir=(0, 1, 0))):
        with Locations((10.785123017, -18.788503179)):
            Rectangle(SKETCH72_W, SKETCH72_H)
    extrude(amount=-CUT_EXTRUDE62_DEPTH, mode=Mode.SUBTRACT)

    # Chamfer4: read off the stored shape, not the designer's step
    # Chamfer4 outline → Chamfer4 (cut)
    with BuildSketch(Plane(origin=(0, 0, 0), x_dir=(0.8249016374005966, -0.41168718087087774, 0.3873641100055655), z_dir=(0.5652762940490381, 0.6007706906735452, -0.5652762940490402)).offset(CHAMFER4_START)):
        Polygon((60.845995289, -38.098530362), (60.845995289, -40.574729045), (62.906847059, -39.336629703), align=None)
    extrude(amount=CHAMFER4_DEPTH, mode=Mode.SUBTRACT)

    # Fillet10
    fillet10_edges = [body_2_2.edges().sort_by_distance(p)[0] for p in [
        (9.900990099, 2, -22.529498148),
    ]]
    fillet(fillet10_edges, radius=FILLET10_R)

    # Sketch73 → Cut-Extrude63 (cut)
    with BuildSketch(Plane(origin=(0, 3, 0), x_dir=(1, 0, 0), z_dir=(0, 1, 0))):
        with Locations(Location((-30.599009901, -7.60748275, 0), (0, 0, 270))):
            Circle(SKETCH73_R)
        with Locations(Location((-30.599009901, -33.00748275, 0), (0, 0, 270))):
            Circle(SKETCH73_R)
        with Locations(Location((50.400990099, -7.60748275, 0), (0, 0, 270))):
            Circle(SKETCH73_R)
        with Locations(Location((50.400990099, -33.00748275, 0), (0, 0, 270))):
            Circle(SKETCH73_R)
        with Locations(Location((-2.799009901, -41.235876529, 0), (0, 0, 270))):
            Circle(SKETCH73_R)
        with Locations(Location((22.600990099, -41.235876529, 0), (0, 0, 270))):
            Circle(SKETCH73_R)
    extrude(amount=-CUT_EXTRUDE63_DEPTH, mode=Mode.SUBTRACT)


solid = body_2_2.part
